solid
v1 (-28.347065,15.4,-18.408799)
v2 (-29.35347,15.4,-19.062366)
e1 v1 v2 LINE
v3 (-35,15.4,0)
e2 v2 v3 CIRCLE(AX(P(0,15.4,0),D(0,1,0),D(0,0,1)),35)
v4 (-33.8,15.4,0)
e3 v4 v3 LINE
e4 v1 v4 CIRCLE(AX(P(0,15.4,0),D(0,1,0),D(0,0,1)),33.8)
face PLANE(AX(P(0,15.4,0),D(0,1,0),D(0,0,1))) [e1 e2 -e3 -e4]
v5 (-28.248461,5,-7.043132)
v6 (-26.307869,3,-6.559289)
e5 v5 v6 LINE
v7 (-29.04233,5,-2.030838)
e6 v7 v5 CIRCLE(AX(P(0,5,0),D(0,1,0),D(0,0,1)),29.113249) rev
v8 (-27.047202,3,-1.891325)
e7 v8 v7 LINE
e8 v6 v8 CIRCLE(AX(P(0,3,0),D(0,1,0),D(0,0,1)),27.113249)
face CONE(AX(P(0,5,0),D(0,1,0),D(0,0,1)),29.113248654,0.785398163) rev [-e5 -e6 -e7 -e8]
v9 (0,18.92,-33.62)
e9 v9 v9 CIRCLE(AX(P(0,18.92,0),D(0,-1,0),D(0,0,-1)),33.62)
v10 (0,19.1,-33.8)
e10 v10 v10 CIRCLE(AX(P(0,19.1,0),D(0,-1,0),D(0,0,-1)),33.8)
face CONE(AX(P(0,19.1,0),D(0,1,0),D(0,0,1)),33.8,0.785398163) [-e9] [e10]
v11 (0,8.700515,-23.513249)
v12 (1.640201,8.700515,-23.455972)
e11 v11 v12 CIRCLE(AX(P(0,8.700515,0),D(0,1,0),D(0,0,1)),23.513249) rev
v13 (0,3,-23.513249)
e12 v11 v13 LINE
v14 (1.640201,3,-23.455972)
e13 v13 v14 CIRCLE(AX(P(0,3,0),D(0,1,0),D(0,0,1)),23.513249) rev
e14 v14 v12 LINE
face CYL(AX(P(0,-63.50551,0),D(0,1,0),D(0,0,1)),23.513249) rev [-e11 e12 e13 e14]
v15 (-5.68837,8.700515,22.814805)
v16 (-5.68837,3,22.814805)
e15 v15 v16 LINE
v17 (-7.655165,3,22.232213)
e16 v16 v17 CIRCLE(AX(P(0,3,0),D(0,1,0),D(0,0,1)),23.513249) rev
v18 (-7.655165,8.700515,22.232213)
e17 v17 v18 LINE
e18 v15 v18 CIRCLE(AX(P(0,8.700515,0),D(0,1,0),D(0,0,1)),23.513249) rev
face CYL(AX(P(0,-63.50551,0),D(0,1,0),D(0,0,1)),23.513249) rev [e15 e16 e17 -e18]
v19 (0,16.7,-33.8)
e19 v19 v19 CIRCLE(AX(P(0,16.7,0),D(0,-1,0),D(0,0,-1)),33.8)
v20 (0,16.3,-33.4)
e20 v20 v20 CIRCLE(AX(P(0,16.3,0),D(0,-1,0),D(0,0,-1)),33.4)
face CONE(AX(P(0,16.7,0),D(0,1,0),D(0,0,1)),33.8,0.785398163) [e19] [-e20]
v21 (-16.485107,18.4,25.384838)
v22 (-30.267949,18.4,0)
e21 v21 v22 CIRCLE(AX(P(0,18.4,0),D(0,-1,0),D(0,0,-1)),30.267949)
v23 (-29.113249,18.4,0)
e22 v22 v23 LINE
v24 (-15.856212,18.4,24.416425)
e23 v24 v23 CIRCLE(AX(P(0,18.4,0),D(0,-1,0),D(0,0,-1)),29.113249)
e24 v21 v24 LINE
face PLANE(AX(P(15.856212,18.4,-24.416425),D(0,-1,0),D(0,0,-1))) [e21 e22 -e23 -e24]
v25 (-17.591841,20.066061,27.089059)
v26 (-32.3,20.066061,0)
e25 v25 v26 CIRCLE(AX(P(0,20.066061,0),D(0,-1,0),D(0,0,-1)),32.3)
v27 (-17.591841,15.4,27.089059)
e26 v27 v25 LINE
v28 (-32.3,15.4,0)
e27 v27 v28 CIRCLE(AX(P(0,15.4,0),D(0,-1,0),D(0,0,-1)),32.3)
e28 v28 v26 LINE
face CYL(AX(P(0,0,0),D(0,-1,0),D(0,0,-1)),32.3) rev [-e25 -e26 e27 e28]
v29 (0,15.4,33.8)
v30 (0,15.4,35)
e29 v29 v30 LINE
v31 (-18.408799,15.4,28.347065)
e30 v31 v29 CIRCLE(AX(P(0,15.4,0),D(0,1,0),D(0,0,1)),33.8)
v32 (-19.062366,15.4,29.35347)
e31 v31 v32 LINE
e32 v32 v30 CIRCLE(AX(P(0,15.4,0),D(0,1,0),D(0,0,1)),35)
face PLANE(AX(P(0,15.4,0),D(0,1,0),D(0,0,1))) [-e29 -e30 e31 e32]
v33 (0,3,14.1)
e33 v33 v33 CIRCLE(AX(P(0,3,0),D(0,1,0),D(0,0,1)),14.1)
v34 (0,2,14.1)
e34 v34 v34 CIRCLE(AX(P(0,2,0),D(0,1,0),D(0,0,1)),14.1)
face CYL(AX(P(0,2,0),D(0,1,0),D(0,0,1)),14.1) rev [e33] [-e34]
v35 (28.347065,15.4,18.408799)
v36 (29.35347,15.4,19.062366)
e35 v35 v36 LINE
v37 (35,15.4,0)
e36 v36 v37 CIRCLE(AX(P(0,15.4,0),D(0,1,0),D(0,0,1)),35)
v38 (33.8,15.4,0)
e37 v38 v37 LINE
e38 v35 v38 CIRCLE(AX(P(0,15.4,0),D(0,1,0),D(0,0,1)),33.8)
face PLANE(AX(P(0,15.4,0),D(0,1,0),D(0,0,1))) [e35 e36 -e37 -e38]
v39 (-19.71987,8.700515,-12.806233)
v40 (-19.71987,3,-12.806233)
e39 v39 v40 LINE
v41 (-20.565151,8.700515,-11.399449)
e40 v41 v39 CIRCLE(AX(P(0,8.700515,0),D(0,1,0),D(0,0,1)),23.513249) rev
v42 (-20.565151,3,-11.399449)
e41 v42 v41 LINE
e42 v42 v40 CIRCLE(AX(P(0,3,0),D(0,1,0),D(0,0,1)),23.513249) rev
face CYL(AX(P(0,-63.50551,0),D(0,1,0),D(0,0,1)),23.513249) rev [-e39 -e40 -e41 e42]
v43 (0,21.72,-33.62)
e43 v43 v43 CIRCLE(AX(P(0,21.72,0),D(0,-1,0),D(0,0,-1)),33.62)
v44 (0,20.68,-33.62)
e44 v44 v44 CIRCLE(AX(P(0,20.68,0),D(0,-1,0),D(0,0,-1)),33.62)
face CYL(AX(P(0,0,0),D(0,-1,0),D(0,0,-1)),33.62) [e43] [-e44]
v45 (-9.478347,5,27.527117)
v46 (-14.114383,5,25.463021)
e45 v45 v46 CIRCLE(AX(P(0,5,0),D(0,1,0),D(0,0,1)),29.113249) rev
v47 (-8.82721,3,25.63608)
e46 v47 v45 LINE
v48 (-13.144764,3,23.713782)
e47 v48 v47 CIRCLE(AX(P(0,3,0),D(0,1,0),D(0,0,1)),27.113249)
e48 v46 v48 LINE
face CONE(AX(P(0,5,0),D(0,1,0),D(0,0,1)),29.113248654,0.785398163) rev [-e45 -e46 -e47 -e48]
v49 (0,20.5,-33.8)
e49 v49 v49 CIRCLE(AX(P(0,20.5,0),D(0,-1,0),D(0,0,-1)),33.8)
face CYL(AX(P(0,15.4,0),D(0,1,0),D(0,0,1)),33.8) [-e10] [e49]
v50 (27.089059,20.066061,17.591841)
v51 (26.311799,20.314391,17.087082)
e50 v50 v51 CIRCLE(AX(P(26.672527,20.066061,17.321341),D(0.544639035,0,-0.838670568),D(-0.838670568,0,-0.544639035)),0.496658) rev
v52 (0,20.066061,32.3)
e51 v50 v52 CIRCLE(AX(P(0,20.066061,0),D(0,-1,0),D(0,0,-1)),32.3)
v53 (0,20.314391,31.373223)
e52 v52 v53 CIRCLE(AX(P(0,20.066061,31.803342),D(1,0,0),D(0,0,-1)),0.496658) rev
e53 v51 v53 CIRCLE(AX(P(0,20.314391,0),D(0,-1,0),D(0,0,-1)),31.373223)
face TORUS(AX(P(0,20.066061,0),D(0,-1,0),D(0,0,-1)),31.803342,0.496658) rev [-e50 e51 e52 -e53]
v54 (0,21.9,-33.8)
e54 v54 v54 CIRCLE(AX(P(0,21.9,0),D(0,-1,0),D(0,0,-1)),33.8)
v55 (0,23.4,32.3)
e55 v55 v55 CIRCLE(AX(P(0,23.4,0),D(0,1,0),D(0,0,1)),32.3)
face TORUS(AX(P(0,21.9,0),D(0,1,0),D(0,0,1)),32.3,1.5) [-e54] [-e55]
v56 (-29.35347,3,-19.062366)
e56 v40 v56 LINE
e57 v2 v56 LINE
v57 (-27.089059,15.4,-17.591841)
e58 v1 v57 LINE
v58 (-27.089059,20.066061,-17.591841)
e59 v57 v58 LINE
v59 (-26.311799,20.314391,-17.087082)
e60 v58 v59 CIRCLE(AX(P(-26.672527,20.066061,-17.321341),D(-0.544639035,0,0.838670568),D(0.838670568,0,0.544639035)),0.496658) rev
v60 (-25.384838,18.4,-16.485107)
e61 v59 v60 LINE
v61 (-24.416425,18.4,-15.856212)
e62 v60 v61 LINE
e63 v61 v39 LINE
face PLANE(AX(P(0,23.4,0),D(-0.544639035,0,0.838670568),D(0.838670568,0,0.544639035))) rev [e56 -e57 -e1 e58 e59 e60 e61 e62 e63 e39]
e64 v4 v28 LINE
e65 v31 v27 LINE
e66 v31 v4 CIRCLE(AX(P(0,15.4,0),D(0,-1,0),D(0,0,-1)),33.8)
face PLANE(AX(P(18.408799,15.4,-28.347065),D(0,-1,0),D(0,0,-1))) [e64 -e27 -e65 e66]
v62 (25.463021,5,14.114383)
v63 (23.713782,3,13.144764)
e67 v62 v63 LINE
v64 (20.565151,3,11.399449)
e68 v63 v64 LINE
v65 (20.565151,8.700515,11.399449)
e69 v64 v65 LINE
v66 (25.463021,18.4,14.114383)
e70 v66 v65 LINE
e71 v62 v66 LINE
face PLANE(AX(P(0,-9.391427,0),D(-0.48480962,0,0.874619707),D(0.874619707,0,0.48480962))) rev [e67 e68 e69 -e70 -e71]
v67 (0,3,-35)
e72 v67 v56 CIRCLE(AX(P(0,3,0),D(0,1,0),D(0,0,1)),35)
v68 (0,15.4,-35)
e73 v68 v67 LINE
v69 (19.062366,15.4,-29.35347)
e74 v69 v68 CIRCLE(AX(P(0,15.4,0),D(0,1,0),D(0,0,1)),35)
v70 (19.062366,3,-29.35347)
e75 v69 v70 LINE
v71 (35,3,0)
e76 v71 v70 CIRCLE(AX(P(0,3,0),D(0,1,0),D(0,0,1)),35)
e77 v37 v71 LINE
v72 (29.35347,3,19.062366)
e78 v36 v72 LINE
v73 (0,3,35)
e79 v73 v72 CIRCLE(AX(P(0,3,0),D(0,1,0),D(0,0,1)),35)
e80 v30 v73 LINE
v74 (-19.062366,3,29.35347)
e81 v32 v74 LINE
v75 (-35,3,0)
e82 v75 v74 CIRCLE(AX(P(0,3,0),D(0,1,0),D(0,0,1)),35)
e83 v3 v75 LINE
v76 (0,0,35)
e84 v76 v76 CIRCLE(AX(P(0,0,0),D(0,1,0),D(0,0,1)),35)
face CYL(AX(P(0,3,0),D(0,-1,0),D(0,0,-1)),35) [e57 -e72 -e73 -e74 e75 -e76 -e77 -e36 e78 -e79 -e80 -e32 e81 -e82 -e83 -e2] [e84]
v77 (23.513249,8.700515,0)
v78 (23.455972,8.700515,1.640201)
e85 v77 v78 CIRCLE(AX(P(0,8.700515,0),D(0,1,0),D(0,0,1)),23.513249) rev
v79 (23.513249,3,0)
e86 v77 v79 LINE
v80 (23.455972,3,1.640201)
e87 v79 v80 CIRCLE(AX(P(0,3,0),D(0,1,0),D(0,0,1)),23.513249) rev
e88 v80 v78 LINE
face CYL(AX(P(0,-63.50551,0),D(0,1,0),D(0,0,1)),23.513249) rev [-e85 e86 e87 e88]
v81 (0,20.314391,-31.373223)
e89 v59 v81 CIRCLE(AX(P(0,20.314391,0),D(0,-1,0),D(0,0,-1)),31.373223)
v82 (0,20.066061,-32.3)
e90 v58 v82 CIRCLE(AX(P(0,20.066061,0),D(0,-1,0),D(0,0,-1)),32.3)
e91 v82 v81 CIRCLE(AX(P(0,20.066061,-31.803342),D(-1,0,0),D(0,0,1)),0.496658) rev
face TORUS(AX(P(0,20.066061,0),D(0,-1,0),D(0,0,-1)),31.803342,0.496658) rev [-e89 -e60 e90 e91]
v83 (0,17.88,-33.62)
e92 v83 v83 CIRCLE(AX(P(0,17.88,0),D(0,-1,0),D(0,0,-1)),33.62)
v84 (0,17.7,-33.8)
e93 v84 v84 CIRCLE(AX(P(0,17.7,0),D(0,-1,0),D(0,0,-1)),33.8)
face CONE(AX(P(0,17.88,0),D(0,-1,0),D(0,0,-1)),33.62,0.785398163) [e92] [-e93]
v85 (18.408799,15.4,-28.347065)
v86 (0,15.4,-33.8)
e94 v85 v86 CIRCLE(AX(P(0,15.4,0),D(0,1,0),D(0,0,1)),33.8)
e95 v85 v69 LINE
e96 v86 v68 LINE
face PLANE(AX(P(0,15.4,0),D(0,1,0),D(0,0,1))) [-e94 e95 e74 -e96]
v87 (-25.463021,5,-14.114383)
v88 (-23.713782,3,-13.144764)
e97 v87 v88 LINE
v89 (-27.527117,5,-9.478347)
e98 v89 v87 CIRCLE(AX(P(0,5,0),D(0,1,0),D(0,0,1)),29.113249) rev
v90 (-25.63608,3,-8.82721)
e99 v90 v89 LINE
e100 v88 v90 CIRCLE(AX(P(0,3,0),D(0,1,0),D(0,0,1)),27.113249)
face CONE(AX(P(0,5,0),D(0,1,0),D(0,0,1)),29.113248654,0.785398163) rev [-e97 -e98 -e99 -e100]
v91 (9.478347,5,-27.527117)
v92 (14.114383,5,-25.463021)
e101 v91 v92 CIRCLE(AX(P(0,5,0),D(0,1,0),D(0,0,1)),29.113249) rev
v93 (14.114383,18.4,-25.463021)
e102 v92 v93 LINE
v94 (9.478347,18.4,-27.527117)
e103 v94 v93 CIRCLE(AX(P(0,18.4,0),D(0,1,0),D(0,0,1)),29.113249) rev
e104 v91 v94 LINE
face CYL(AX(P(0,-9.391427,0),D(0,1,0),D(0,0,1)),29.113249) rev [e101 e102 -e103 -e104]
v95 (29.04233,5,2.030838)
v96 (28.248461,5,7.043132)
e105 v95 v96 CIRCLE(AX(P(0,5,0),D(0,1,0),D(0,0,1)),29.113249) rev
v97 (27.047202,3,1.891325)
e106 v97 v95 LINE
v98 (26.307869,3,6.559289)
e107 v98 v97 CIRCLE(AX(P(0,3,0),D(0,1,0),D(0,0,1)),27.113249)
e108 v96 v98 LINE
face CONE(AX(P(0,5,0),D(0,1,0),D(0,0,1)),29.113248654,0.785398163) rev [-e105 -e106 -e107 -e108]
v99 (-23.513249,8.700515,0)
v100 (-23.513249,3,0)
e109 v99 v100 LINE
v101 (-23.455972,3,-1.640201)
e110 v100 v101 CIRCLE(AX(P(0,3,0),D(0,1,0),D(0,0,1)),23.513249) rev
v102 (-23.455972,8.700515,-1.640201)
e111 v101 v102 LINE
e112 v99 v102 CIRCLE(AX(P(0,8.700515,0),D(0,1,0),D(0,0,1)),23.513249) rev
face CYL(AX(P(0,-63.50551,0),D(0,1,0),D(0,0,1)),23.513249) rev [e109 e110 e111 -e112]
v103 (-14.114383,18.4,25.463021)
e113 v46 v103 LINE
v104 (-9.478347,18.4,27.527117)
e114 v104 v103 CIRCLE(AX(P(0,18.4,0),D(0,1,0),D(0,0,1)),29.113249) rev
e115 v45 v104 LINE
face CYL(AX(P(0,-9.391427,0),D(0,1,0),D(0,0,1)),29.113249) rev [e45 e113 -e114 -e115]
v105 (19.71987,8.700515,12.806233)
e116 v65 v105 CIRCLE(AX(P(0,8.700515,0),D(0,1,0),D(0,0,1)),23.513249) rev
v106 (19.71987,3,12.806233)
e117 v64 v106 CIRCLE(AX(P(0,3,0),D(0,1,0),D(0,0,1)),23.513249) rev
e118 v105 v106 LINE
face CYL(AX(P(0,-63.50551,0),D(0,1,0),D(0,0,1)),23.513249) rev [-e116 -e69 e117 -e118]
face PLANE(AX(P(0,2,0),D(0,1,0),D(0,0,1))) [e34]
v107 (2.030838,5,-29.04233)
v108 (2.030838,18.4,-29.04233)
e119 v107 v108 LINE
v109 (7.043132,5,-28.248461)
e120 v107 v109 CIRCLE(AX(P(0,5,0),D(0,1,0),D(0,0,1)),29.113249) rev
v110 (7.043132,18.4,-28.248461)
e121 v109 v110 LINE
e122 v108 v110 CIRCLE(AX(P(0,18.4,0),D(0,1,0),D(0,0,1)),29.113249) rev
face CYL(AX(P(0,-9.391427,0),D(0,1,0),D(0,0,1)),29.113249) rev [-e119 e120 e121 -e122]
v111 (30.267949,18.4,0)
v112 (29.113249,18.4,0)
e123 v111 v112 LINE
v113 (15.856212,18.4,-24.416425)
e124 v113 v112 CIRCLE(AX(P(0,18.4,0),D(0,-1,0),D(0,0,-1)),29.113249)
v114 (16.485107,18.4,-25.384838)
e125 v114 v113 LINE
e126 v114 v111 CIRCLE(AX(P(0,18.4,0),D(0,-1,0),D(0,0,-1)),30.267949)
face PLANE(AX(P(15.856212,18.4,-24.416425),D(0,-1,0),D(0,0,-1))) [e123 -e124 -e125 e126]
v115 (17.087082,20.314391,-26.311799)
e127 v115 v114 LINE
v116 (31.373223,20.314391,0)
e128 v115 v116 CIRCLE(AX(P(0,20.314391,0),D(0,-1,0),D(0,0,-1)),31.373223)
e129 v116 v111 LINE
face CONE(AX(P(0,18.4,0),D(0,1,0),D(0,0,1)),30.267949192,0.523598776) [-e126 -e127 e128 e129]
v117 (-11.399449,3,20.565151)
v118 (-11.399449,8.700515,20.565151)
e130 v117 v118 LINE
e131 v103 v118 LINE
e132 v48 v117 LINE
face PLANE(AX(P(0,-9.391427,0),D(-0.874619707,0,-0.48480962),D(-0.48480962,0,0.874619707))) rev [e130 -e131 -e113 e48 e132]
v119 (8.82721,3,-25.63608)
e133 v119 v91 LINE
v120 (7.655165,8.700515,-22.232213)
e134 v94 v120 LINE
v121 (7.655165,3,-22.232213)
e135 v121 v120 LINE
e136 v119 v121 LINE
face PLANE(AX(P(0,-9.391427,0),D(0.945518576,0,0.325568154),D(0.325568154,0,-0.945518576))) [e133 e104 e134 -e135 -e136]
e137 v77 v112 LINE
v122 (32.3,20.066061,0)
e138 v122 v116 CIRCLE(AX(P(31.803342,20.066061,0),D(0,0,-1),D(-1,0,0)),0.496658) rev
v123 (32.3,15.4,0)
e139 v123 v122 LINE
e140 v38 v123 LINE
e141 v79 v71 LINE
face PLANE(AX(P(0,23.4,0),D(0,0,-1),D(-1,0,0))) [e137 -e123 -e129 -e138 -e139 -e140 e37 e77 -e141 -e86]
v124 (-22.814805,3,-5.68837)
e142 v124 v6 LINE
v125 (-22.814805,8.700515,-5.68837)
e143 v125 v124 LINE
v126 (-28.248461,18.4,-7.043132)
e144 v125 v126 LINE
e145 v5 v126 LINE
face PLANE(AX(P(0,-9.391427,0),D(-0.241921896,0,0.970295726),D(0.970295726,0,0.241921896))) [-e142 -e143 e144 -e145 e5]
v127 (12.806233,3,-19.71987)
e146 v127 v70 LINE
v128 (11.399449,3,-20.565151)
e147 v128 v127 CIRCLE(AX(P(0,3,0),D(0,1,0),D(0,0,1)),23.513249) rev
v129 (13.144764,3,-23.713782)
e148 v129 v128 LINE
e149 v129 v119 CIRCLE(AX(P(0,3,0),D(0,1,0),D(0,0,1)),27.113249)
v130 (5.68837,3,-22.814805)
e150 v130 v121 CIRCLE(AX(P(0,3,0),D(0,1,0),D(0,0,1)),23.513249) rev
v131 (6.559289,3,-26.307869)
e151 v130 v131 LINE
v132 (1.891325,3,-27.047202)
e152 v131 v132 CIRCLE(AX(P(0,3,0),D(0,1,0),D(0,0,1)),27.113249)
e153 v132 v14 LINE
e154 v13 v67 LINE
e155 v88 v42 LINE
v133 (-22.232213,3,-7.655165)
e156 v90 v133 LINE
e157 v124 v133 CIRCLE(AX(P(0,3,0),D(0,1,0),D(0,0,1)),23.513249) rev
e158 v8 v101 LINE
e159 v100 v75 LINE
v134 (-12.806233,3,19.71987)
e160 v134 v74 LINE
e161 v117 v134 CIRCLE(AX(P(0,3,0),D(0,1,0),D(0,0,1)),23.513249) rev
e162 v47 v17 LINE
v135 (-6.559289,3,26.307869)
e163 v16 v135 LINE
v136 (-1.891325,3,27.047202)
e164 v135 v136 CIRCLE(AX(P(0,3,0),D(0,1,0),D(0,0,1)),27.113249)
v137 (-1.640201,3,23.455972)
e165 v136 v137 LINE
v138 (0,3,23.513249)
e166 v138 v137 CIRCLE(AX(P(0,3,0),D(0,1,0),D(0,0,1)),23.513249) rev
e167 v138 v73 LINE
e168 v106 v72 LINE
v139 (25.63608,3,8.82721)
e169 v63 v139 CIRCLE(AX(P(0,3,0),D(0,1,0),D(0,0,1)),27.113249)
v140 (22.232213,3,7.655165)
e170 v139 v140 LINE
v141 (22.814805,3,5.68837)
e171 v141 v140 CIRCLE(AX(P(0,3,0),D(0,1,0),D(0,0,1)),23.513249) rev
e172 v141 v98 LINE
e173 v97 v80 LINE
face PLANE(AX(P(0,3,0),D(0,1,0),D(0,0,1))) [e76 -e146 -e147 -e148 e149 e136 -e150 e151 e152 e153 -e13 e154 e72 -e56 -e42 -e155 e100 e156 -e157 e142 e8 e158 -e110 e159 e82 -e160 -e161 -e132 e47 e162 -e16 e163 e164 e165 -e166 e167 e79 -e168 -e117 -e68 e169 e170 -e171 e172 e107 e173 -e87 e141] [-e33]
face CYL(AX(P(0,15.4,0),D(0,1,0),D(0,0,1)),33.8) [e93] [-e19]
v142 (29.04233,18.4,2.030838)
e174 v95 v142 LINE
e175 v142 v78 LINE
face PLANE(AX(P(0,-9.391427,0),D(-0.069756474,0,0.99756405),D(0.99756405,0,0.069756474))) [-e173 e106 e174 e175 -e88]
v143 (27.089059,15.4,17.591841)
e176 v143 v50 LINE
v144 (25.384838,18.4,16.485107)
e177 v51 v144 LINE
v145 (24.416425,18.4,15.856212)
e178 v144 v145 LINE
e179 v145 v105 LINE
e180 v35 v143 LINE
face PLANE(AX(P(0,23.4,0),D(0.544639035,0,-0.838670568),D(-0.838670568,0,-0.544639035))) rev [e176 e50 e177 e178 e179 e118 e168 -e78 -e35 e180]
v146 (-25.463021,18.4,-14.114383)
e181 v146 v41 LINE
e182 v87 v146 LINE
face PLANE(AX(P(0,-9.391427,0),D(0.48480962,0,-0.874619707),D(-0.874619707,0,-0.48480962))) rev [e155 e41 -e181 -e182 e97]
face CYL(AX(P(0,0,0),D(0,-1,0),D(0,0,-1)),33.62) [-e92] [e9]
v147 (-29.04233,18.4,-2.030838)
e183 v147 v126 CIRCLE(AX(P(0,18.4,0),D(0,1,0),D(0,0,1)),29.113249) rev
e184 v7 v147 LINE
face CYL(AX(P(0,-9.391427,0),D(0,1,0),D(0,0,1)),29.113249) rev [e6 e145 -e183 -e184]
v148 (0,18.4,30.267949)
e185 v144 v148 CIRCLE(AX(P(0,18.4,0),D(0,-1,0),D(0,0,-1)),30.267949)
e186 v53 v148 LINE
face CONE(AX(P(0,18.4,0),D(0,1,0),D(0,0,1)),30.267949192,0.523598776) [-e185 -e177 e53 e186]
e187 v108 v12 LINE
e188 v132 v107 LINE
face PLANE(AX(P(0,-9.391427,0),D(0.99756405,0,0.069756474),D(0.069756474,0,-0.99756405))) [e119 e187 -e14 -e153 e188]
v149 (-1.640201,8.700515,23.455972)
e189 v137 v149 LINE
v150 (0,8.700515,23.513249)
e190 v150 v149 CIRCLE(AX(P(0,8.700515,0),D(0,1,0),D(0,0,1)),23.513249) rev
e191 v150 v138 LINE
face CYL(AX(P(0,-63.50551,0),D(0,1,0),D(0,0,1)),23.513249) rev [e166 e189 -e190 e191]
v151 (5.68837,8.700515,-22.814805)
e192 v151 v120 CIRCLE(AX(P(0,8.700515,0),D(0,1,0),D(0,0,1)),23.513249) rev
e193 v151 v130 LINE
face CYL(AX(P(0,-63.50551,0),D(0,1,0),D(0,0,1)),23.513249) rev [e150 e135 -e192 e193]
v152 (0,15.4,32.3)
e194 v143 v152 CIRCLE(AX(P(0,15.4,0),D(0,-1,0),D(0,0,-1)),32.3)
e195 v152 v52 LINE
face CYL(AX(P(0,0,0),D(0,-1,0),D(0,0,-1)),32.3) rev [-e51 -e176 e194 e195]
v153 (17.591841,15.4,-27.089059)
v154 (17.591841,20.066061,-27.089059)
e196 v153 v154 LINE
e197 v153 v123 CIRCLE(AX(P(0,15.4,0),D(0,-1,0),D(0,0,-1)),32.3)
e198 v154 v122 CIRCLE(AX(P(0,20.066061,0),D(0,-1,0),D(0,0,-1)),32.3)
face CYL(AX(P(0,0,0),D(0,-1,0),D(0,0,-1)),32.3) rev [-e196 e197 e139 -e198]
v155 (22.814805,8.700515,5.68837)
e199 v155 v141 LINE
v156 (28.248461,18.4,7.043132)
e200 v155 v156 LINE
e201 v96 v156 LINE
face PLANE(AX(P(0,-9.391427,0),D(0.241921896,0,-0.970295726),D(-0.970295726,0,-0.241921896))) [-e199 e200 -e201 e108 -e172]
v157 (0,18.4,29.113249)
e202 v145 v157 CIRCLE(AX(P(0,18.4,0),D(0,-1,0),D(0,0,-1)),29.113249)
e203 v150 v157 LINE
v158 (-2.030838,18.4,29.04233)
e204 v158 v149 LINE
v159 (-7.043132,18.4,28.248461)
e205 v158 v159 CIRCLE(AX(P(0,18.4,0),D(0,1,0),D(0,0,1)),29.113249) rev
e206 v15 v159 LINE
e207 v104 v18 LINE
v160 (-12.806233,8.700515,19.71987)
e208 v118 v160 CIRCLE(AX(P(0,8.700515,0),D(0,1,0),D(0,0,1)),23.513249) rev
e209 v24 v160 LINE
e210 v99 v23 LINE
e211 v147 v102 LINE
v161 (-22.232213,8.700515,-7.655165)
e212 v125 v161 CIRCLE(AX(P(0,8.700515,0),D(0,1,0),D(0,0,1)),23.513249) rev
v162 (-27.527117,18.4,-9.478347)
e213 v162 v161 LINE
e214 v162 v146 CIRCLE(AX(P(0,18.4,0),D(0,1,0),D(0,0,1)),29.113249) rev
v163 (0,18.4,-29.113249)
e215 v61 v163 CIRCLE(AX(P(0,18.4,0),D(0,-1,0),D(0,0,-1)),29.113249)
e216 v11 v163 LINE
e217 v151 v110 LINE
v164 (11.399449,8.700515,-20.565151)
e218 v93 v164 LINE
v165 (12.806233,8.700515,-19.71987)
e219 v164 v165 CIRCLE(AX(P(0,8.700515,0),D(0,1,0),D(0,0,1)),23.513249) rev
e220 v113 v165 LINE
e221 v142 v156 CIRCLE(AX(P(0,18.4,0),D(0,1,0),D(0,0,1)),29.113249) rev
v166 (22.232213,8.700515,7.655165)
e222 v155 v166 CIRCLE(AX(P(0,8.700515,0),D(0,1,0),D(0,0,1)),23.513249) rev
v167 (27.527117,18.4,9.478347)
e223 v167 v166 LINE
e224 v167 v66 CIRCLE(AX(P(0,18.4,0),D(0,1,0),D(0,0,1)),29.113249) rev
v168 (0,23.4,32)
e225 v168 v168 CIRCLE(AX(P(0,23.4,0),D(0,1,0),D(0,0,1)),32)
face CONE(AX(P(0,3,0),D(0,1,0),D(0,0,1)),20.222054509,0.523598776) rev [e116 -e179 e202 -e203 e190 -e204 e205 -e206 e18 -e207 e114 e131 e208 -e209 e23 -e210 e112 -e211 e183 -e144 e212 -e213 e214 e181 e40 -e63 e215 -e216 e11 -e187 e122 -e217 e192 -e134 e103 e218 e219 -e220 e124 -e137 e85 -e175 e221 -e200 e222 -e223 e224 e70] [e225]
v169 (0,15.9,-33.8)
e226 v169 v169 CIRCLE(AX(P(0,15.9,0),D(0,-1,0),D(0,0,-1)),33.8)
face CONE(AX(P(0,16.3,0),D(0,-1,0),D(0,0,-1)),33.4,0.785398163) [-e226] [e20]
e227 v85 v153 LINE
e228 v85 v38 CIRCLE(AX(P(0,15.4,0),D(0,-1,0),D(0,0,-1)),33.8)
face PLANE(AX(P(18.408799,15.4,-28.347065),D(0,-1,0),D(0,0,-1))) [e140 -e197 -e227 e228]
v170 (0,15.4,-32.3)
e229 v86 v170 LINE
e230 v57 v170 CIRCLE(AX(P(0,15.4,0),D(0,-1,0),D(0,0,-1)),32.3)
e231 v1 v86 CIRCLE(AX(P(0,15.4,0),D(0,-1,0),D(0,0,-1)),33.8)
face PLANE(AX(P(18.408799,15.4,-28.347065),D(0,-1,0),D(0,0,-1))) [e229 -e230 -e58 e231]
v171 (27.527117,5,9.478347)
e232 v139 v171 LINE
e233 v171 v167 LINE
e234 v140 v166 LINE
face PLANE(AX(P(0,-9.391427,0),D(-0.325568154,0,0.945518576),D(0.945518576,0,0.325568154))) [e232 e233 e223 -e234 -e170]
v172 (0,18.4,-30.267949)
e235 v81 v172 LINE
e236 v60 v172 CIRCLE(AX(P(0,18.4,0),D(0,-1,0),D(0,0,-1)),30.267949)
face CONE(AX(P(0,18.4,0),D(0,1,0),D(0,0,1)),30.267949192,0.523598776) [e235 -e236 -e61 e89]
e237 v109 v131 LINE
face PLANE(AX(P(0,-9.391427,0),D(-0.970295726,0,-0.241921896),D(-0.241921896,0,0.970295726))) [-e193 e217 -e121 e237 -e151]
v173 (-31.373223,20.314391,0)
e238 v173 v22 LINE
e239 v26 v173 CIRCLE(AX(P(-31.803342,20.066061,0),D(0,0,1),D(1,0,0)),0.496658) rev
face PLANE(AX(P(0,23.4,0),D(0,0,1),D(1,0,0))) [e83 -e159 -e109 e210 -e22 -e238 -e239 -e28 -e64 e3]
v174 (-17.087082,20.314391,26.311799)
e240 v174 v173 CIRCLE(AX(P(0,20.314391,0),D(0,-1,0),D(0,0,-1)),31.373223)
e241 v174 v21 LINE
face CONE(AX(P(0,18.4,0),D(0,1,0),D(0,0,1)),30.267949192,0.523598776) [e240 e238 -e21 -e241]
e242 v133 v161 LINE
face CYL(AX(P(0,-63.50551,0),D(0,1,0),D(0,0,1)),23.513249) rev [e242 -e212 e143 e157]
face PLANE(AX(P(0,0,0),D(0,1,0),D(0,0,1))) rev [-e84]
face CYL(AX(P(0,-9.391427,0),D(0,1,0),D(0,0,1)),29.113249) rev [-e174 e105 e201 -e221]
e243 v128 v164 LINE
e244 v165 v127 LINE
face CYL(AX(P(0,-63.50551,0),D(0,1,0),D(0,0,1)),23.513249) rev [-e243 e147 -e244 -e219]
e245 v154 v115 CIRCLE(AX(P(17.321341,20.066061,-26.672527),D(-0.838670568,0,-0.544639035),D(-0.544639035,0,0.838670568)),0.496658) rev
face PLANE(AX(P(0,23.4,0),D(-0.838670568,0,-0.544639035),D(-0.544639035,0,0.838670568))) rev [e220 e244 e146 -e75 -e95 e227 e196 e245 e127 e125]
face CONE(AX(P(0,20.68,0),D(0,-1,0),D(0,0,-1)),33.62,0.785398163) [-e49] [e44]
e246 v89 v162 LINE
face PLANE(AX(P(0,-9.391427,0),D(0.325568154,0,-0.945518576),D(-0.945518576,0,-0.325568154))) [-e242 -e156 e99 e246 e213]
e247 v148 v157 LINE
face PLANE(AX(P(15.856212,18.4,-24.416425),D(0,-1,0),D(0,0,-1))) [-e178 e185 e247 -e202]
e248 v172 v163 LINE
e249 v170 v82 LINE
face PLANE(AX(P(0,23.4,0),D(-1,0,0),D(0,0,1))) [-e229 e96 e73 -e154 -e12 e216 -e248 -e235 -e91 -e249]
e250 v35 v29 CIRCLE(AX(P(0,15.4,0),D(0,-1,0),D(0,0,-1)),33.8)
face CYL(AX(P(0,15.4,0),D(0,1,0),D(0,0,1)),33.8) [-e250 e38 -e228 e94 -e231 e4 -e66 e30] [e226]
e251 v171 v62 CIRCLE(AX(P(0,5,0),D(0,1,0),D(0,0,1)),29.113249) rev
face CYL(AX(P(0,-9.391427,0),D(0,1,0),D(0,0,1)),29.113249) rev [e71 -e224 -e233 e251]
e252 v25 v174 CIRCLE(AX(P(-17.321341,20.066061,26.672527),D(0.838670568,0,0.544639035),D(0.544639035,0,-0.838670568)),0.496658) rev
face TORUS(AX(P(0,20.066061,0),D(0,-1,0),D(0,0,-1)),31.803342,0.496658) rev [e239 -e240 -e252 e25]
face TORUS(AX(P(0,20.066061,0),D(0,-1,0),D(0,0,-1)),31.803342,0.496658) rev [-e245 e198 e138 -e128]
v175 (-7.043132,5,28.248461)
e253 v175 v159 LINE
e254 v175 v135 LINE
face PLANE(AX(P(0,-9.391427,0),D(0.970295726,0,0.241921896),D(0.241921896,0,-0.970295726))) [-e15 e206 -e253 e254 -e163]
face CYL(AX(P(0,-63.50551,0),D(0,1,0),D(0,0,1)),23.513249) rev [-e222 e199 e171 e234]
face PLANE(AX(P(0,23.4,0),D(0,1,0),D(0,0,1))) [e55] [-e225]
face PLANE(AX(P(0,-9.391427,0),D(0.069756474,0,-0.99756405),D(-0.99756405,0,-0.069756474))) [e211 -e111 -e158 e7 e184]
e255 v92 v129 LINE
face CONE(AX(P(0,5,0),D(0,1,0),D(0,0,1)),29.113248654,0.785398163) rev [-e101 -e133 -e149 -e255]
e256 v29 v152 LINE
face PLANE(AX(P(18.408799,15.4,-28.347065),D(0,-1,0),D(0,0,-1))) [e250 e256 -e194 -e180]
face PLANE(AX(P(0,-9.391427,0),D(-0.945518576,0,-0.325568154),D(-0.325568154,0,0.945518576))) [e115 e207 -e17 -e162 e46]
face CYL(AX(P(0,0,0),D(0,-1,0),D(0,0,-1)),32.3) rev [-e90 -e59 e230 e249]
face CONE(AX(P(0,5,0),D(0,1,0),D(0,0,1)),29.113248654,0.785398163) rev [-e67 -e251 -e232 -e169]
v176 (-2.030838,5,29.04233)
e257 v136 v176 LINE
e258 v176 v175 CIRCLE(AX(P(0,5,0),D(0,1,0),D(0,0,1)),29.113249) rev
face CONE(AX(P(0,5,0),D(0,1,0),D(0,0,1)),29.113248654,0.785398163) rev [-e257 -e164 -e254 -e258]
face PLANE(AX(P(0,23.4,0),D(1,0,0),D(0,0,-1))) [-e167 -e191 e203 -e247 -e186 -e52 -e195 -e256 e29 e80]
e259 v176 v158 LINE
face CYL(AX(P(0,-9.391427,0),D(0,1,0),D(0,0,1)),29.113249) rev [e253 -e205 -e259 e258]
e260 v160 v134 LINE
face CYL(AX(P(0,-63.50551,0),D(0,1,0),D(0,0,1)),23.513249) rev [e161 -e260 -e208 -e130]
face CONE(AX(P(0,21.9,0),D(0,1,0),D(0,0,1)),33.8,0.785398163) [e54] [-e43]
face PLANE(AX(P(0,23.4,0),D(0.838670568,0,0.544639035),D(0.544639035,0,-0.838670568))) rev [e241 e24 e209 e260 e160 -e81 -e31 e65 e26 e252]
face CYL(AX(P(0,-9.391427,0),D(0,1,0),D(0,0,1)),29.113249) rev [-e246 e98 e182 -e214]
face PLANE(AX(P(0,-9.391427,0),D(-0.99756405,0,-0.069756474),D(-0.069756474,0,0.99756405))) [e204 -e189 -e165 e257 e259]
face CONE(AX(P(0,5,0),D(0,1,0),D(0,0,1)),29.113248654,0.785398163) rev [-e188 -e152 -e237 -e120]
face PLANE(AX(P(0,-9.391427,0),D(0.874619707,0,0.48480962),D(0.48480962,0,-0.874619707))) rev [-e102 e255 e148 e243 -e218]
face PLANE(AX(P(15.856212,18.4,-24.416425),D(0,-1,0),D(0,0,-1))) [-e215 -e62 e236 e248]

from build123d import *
from OCP.BRepFilletAPI import BRepFilletAPI_MakeChamfer
from build123d.topology import SkipClean

# Parameters (mm, degrees)
SKETCH_1_R          = 35
EXTRUDE_1_DEPTH     = 3
EXTRUDE_2_DEPTH     = 20.4
SKETCH_3_R          = 14.1
CUT_EXTRUDE_1_DEPTH = 1
CUT_EXTRUDE_START   = -8
SKETCH_4_R          = 35
SKETCH_4_R_2        = 33.8
CUT_EXTRUDE_2_DEPTH = 8
FILLET_1_R          = 1.5
CHAMFER_1_SIZE      = 11.777945491
CHAMFER_1_SIZE_2    = 20.4
CUT_EXTRUDE_3_DEPTH = 20.4
SKETCH_7_R          = 23.513248654
CUT_EXTRUDE_4_DEPTH = 20.4
CHAMFER_2_SIZE      = 2


with BuildPart() as part:
    # 草图1 → 凸台-拉伸1 (new body)
    with BuildSketch(Plane(origin=(0, 0, 0), x_dir=(1, 0, 0), z_dir=(0, 1, 0))):
        with Locations(Location((0, 0, 0), (0, 0, 270))):
            Circle(SKETCH_1_R)
    extrude(amount=EXTRUDE_1_DEPTH)

    # 草图2 → 凸台-拉伸2 (add)
    with SkipClean():  # the faces are left unmerged after this step: merging them gives an invalid solid
        with BuildSketch(Plane(origin=(0, 3, 0), x_dir=(1, 0, 0), z_dir=(0, 1, 0))):
            with BuildLine():
                Line((0, 35), (0, 32))
                ThreePointArc((0, 32), (9.088491031, 30.682231516), (17.42844912, 26.837458174))
                Line((17.42844912, 26.837458174), (19.062366226, 29.353469878))
                ThreePointArc((19.062366226, 29.353469878), (9.940537065, 33.55869072), (0, 35))
            make_face()
            with BuildLine():
                ThreePointArc((-32, 0), (-30.682231516, 9.088491031), (-26.837458174, 17.42844912))
                Line((-26.837458174, 17.42844912), (-29.353469878, 19.062366226))
                ThreePointArc((-29.353469878, 19.062366226), (-33.55869072, 9.940537065), (-35, 0))
                Line((-35, 0), (-32, 0))
            make_face()
            with BuildLine():
                Line((35, 0), (32, 0))
                ThreePointArc((32, 0), (30.682231516, -9.088491031), (26.837458174, -17.42844912))
                Line((26.837458174, -17.42844912), (29.353469878, -19.062366226))
                ThreePointArc((29.353469878, -19.062366226), (33.55869072, -9.940537065), (35, 0))
            make_face()
            with BuildLine():
                ThreePointArc((0, -32), (-9.088491031, -30.682231516), (-17.42844912, -26.837458174))
                Line((-17.42844912, -26.837458174), (-19.062366226, -29.353469878))
                ThreePointArc((-19.062366226, -29.353469878), (-9.940537065, -33.55869072), (0, -35))
                Line((0, -35), (0, -32))
            make_face()
        extrude(amount=EXTRUDE_2_DEPTH)

    # 草图3 → 切除-拉伸1 (cut)
    with SkipClean():  # the faces are left unmerged after this step: merging them gives an invalid solid
        with BuildSketch(Plane(origin=(0, 3, 0), x_dir=(1, 0, 0), z_dir=(0, 1, 0))):
            with Locations(Location((0, 0, 0), (0, 0, 270))):
                Circle(SKETCH_3_R)
        extrude(amount=-CUT_EXTRUDE_1_DEPTH, mode=Mode.SUBTRACT)

    # 草图4 → 切除-拉伸2 (cut)
    with SkipClean():  # the faces are left unmerged after this step: merging them gives an invalid solid
        with BuildSketch(Plane(origin=(0, 23.4, 0), x_dir=(1, 0, 0), z_dir=(0, 1, 0)).offset(CUT_EXTRUDE_START)):
            with Locations(Location((0, 0, 0), (0, 0, 270))):
                Circle(SKETCH_4_R)
            Circle(SKETCH_4_R_2, mode=Mode.SUBTRACT)
        extrude(amount=CUT_EXTRUDE_2_DEPTH, mode=Mode.SUBTRACT)

    # 圆角1
    fillet_1_edges = [part.edges().sort_by_distance(p)[0] for p in [
        (32.408107039, 23.4, 9.599718651),
        (9.599718651, 23.4, -32.408107039),
        (-32.408107039, 23.4, -9.599718651),
        (-9.599718651, 23.4, 32.408107039),
    ]]
    fillet(fillet_1_edges, radius=FILLET_1_R)

    # 倒角1
    chamfer_1_edges_1 = [part.edges().sort_by_distance(p)[0] for p in [
        (30.682231516, 3, 9.088491031),
    ]]
    chamfer_1_side_1 = [part.faces().sort_by_distance(p)[0] for p in [
        (30.456372984, 3, 9.021588686),
    ]]
    chamfer_1_edges_2 = [part.edges().sort_by_distance(p)[0] for p in [
        (9.088491031, 3, -30.682231516),
    ]]
    chamfer_1_side_2 = [part.faces().sort_by_distance(p)[0] for p in [
        (9.021588686, 3, -30.456372984),
    ]]
    chamfer_1_edges_3 = [part.edges().sort_by_distance(p)[0] for p in [
        (-30.682231516, 3, -9.088491031),
    ]]
    chamfer_1_side_3 = [part.faces().sort_by_distance(p)[0] for p in [
        (-30.456372984, 3, -9.021588686),
    ]]
    chamfer_1_edges_4 = [part.edges().sort_by_distance(p)[0] for p in [
        (-9.088491031, 3, 30.682231516),
    ]]
    chamfer_1_side_4 = [part.faces().sort_by_distance(p)[0] for p in [
        (-9.088491031, 3.23555891, 30.682231516),
    ]]
    chamfer_1 = BRepFilletAPI_MakeChamfer(part.part.solid().wrapped)
    for e in chamfer_1_edges_1:
        chamfer_1.Add(CHAMFER_1_SIZE - 0.0001, CHAMFER_1_SIZE_2 - 0.0001, e.wrapped, chamfer_1_side_1[0].wrapped)
    for e in chamfer_1_edges_2:
        chamfer_1.Add(CHAMFER_1_SIZE - 0.0001, CHAMFER_1_SIZE_2 - 0.0001, e.wrapped, chamfer_1_side_2[0].wrapped)
    for e in chamfer_1_edges_3:
        chamfer_1.Add(CHAMFER_1_SIZE - 0.0001, CHAMFER_1_SIZE_2 - 0.0001, e.wrapped, chamfer_1_side_3[0].wrapped)
    for e in chamfer_1_edges_4:
        chamfer_1.Add(CHAMFER_1_SIZE_2 - 0.0001, CHAMFER_1_SIZE - 0.0001, e.wrapped, chamfer_1_side_4[0].wrapped)
    add(Compound.cast(chamfer_1.Shape()), mode=Mode.REPLACE)  # a hair under: the kernel refuses the full size

    # 草图10 → 旋转2 (revolve)
    with BuildSketch(Plane(origin=(0, 0, 0), x_dir=(0.5446390350150274, 0, -0.8386705679454238), z_dir=(0.8386705679454238, 0, 0.5446390350150274)), mode=Mode.PRIVATE) as revolve_2_sk:
        with BuildLine():
            Line((32, 23.4), (29.113248654, 18.4))
            Line((29.113248654, 18.4), (30.267949192, 18.4))
            Line((30.267949192, 18.4), (31.373223106, 20.314390574))
            ThreePointArc((31.373223106, 20.314390574), (31.931886371, 20.545796475), (32.3, 20.066061454))
            Line((32.3, 20.066061454), (32.3, 15.4))
            Line((32.3, 15.4), (33.8, 15.4))
            Line((33.8, 15.4), (33.8, 21.9))
            ThreePointArc((33.8, 21.9), (33.360660172, 22.960660172), (32.3, 23.4))
            Line((32.3, 23.4), (32, 23.4))
        make_face()
    revolve(revolve_2_sk.sketch.rotate(Axis((0, 0, 0), (0, 1, 0)), 213), axis=Axis((0, 0, 0), (0, 1, 0)))

    # 草图6 → 切除-拉伸3 (cut)
    with BuildSketch(Plane(origin=(0, 23.4, 0), x_dir=(1, 0, 0), z_dir=(0, 1, 0))):
        with BuildLine():
            ThreePointArc((-20.1727946, 1.410619214), (-19.973087461, 3.163426279), (-19.621373066, 4.89215776))
            Line((-19.621373066, 4.89215776), (-28.248460747, 7.043132301))
            ThreePointArc((-28.248460747, 7.043132301), (-28.754816252, 4.554315479), (-29.042330244, 2.030837565))
            Line((-29.042330244, 2.030837565), (-20.1727946, 1.410619214))
        make_face()
        with BuildLine():
            ThreePointArc((-19.120328175, 6.583656966), (-18.47376604, 8.225050567), (-17.686607392, 9.803846567))
            Line((-17.686607392, 9.803846567), (-25.463021012, 14.114383024))
            ThreePointArc((-25.463021012, 14.114383024), (-26.596276065, 11.841425027), (-27.527117398, 9.478346635))
            Line((-27.527117398, 9.478346635), (-19.120328175, 6.583656966))
        make_face()
        with BuildLine():
            ThreePointArc((-6.583656966, -19.120328175), (-8.225050567, -18.47376604), (-9.803846567, -17.686607392))
            Line((-9.803846567, -17.686607392), (-14.114383024, -25.463021012))
            ThreePointArc((-14.114383024, -25.463021012), (-11.841425027, -26.596276065), (-9.478346635, -27.527117398))
            Line((-9.478346635, -27.527117398), (-6.583656966, -19.120328175))
        make_face()
        with BuildLine():
            ThreePointArc((-1.410619214, -20.1727946), (-3.163426279, -19.973087461), (-4.89215776, -19.621373066))
            Line((-4.89215776, -19.621373066), (-7.043132301, -28.248460747))
            ThreePointArc((-7.043132301, -28.248460747), (-4.554315479, -28.754816252), (-2.030837565, -29.042330244))
            Line((-2.030837565, -29.042330244), (-1.410619214, -20.1727946))
        make_face()
        with BuildLine():
            Line((27.527117398, -9.478346635), (19.120328175, -6.583656966))
            ThreePointArc((19.120328175, -6.583656966), (18.47376604, -8.225050567), (17.686607392, -9.803846567))
            Line((17.686607392, -9.803846567), (25.463021012, -14.114383024))
            ThreePointArc((25.463021012, -14.114383024), (26.596276065, -11.841425027), (27.527117398, -9.478346635))
        make_face()
        with BuildLine():
            Line((29.042330244, -2.030837565), (20.1727946, -1.410619214))
            ThreePointArc((20.1727946, -1.410619214), (19.973087461, -3.163426279), (19.621373066, -4.89215776))
            Line((19.621373066, -4.89215776), (28.248460747, -7.043132301))
            ThreePointArc((28.248460747, -7.043132301), (28.754816252, -4.554315479), (29.042330244, -2.030837565))
        make_face()
        with BuildLine():
            Line((9.478346635, 27.527117398), (6.583656966, 19.120328175))
            ThreePointArc((6.583656966, 19.120328175), (8.225050567, 18.47376604), (9.803846567, 17.686607392))
            Line((9.803846567, 17.686607392), (14.114383024, 25.463021012))
            ThreePointArc((14.114383024, 25.463021012), (11.841425027, 26.596276065), (9.478346635, 27.527117398))
        make_face()
        with BuildLine():
            Line((2.030837565, 29.042330244), (1.410619214, 20.1727946))
            ThreePointArc((1.410619214, 20.1727946), (3.163426279, 19.973087461), (4.89215776, 19.621373066))
            Line((4.89215776, 19.621373066), (7.043132301, 28.248460747))
            ThreePointArc((7.043132301, 28.248460747), (4.554315479, 28.754816252), (2.030837565, 29.042330244))
        make_face()
    extrude(amount=-CUT_EXTRUDE_3_DEPTH, mode=Mode.SUBTRACT)

    # 草图7 → 切除-拉伸4 (cut)
    with BuildSketch(Plane(origin=(0, 23.4, 0), x_dir=(1, 0, 0), z_dir=(0, 1, 0))):
        Circle(SKETCH_7_R)
    extrude(amount=-CUT_EXTRUDE_4_DEPTH, mode=Mode.SUBTRACT)

    # 倒角2
    chamfer_2_edges = [part.edges().sort_by_distance(p)[0] for p in [
        (26.596276065, 3, 11.841425027),
        (-4.554315479, 3, 28.754816252),
        (-11.841425027, 3, 26.596276065),
        (-26.596276065, 3, -11.841425027),
        (4.554315479, 3, -28.754816252),
        (11.841425027, 3, -26.596276065),
        (28.754816252, 3, 4.554315479),
        (-28.754816252, 3, -4.554315479),
    ]]
    chamfer(chamfer_2_edges, length=CHAMFER_2_SIZE)

    # 草图11 → 切除-旋转1 (revolve, cut)
    with BuildSketch(Plane(origin=(0, 0, 0), x_dir=(-0.8386705679454236, 0, -0.5446390350150278), z_dir=(0.5446390350150278, 0, -0.8386705679454236)), mode=Mode.PRIVATE) as cut_revolve_1_sk:
        Polygon((33.8, 21.9), (33.62, 21.72), (33.62, 20.68), (33.8, 20.5), align=None)
        Polygon((33.8, 19.1), (33.62, 18.92), (33.62, 17.88), (33.8, 17.7), align=None)
        Polygon((33.8, 16.7), (33.4, 16.3), (33.8, 15.9), align=None)
    revolve(cut_revolve_1_sk.sketch.rotate(Axis((0, 0, 0), (0, 1, 0)), 303), axis=Axis((0, 0, 0), (0, 1, 0)), mode=Mode.SUBTRACT)


solid = part.part
